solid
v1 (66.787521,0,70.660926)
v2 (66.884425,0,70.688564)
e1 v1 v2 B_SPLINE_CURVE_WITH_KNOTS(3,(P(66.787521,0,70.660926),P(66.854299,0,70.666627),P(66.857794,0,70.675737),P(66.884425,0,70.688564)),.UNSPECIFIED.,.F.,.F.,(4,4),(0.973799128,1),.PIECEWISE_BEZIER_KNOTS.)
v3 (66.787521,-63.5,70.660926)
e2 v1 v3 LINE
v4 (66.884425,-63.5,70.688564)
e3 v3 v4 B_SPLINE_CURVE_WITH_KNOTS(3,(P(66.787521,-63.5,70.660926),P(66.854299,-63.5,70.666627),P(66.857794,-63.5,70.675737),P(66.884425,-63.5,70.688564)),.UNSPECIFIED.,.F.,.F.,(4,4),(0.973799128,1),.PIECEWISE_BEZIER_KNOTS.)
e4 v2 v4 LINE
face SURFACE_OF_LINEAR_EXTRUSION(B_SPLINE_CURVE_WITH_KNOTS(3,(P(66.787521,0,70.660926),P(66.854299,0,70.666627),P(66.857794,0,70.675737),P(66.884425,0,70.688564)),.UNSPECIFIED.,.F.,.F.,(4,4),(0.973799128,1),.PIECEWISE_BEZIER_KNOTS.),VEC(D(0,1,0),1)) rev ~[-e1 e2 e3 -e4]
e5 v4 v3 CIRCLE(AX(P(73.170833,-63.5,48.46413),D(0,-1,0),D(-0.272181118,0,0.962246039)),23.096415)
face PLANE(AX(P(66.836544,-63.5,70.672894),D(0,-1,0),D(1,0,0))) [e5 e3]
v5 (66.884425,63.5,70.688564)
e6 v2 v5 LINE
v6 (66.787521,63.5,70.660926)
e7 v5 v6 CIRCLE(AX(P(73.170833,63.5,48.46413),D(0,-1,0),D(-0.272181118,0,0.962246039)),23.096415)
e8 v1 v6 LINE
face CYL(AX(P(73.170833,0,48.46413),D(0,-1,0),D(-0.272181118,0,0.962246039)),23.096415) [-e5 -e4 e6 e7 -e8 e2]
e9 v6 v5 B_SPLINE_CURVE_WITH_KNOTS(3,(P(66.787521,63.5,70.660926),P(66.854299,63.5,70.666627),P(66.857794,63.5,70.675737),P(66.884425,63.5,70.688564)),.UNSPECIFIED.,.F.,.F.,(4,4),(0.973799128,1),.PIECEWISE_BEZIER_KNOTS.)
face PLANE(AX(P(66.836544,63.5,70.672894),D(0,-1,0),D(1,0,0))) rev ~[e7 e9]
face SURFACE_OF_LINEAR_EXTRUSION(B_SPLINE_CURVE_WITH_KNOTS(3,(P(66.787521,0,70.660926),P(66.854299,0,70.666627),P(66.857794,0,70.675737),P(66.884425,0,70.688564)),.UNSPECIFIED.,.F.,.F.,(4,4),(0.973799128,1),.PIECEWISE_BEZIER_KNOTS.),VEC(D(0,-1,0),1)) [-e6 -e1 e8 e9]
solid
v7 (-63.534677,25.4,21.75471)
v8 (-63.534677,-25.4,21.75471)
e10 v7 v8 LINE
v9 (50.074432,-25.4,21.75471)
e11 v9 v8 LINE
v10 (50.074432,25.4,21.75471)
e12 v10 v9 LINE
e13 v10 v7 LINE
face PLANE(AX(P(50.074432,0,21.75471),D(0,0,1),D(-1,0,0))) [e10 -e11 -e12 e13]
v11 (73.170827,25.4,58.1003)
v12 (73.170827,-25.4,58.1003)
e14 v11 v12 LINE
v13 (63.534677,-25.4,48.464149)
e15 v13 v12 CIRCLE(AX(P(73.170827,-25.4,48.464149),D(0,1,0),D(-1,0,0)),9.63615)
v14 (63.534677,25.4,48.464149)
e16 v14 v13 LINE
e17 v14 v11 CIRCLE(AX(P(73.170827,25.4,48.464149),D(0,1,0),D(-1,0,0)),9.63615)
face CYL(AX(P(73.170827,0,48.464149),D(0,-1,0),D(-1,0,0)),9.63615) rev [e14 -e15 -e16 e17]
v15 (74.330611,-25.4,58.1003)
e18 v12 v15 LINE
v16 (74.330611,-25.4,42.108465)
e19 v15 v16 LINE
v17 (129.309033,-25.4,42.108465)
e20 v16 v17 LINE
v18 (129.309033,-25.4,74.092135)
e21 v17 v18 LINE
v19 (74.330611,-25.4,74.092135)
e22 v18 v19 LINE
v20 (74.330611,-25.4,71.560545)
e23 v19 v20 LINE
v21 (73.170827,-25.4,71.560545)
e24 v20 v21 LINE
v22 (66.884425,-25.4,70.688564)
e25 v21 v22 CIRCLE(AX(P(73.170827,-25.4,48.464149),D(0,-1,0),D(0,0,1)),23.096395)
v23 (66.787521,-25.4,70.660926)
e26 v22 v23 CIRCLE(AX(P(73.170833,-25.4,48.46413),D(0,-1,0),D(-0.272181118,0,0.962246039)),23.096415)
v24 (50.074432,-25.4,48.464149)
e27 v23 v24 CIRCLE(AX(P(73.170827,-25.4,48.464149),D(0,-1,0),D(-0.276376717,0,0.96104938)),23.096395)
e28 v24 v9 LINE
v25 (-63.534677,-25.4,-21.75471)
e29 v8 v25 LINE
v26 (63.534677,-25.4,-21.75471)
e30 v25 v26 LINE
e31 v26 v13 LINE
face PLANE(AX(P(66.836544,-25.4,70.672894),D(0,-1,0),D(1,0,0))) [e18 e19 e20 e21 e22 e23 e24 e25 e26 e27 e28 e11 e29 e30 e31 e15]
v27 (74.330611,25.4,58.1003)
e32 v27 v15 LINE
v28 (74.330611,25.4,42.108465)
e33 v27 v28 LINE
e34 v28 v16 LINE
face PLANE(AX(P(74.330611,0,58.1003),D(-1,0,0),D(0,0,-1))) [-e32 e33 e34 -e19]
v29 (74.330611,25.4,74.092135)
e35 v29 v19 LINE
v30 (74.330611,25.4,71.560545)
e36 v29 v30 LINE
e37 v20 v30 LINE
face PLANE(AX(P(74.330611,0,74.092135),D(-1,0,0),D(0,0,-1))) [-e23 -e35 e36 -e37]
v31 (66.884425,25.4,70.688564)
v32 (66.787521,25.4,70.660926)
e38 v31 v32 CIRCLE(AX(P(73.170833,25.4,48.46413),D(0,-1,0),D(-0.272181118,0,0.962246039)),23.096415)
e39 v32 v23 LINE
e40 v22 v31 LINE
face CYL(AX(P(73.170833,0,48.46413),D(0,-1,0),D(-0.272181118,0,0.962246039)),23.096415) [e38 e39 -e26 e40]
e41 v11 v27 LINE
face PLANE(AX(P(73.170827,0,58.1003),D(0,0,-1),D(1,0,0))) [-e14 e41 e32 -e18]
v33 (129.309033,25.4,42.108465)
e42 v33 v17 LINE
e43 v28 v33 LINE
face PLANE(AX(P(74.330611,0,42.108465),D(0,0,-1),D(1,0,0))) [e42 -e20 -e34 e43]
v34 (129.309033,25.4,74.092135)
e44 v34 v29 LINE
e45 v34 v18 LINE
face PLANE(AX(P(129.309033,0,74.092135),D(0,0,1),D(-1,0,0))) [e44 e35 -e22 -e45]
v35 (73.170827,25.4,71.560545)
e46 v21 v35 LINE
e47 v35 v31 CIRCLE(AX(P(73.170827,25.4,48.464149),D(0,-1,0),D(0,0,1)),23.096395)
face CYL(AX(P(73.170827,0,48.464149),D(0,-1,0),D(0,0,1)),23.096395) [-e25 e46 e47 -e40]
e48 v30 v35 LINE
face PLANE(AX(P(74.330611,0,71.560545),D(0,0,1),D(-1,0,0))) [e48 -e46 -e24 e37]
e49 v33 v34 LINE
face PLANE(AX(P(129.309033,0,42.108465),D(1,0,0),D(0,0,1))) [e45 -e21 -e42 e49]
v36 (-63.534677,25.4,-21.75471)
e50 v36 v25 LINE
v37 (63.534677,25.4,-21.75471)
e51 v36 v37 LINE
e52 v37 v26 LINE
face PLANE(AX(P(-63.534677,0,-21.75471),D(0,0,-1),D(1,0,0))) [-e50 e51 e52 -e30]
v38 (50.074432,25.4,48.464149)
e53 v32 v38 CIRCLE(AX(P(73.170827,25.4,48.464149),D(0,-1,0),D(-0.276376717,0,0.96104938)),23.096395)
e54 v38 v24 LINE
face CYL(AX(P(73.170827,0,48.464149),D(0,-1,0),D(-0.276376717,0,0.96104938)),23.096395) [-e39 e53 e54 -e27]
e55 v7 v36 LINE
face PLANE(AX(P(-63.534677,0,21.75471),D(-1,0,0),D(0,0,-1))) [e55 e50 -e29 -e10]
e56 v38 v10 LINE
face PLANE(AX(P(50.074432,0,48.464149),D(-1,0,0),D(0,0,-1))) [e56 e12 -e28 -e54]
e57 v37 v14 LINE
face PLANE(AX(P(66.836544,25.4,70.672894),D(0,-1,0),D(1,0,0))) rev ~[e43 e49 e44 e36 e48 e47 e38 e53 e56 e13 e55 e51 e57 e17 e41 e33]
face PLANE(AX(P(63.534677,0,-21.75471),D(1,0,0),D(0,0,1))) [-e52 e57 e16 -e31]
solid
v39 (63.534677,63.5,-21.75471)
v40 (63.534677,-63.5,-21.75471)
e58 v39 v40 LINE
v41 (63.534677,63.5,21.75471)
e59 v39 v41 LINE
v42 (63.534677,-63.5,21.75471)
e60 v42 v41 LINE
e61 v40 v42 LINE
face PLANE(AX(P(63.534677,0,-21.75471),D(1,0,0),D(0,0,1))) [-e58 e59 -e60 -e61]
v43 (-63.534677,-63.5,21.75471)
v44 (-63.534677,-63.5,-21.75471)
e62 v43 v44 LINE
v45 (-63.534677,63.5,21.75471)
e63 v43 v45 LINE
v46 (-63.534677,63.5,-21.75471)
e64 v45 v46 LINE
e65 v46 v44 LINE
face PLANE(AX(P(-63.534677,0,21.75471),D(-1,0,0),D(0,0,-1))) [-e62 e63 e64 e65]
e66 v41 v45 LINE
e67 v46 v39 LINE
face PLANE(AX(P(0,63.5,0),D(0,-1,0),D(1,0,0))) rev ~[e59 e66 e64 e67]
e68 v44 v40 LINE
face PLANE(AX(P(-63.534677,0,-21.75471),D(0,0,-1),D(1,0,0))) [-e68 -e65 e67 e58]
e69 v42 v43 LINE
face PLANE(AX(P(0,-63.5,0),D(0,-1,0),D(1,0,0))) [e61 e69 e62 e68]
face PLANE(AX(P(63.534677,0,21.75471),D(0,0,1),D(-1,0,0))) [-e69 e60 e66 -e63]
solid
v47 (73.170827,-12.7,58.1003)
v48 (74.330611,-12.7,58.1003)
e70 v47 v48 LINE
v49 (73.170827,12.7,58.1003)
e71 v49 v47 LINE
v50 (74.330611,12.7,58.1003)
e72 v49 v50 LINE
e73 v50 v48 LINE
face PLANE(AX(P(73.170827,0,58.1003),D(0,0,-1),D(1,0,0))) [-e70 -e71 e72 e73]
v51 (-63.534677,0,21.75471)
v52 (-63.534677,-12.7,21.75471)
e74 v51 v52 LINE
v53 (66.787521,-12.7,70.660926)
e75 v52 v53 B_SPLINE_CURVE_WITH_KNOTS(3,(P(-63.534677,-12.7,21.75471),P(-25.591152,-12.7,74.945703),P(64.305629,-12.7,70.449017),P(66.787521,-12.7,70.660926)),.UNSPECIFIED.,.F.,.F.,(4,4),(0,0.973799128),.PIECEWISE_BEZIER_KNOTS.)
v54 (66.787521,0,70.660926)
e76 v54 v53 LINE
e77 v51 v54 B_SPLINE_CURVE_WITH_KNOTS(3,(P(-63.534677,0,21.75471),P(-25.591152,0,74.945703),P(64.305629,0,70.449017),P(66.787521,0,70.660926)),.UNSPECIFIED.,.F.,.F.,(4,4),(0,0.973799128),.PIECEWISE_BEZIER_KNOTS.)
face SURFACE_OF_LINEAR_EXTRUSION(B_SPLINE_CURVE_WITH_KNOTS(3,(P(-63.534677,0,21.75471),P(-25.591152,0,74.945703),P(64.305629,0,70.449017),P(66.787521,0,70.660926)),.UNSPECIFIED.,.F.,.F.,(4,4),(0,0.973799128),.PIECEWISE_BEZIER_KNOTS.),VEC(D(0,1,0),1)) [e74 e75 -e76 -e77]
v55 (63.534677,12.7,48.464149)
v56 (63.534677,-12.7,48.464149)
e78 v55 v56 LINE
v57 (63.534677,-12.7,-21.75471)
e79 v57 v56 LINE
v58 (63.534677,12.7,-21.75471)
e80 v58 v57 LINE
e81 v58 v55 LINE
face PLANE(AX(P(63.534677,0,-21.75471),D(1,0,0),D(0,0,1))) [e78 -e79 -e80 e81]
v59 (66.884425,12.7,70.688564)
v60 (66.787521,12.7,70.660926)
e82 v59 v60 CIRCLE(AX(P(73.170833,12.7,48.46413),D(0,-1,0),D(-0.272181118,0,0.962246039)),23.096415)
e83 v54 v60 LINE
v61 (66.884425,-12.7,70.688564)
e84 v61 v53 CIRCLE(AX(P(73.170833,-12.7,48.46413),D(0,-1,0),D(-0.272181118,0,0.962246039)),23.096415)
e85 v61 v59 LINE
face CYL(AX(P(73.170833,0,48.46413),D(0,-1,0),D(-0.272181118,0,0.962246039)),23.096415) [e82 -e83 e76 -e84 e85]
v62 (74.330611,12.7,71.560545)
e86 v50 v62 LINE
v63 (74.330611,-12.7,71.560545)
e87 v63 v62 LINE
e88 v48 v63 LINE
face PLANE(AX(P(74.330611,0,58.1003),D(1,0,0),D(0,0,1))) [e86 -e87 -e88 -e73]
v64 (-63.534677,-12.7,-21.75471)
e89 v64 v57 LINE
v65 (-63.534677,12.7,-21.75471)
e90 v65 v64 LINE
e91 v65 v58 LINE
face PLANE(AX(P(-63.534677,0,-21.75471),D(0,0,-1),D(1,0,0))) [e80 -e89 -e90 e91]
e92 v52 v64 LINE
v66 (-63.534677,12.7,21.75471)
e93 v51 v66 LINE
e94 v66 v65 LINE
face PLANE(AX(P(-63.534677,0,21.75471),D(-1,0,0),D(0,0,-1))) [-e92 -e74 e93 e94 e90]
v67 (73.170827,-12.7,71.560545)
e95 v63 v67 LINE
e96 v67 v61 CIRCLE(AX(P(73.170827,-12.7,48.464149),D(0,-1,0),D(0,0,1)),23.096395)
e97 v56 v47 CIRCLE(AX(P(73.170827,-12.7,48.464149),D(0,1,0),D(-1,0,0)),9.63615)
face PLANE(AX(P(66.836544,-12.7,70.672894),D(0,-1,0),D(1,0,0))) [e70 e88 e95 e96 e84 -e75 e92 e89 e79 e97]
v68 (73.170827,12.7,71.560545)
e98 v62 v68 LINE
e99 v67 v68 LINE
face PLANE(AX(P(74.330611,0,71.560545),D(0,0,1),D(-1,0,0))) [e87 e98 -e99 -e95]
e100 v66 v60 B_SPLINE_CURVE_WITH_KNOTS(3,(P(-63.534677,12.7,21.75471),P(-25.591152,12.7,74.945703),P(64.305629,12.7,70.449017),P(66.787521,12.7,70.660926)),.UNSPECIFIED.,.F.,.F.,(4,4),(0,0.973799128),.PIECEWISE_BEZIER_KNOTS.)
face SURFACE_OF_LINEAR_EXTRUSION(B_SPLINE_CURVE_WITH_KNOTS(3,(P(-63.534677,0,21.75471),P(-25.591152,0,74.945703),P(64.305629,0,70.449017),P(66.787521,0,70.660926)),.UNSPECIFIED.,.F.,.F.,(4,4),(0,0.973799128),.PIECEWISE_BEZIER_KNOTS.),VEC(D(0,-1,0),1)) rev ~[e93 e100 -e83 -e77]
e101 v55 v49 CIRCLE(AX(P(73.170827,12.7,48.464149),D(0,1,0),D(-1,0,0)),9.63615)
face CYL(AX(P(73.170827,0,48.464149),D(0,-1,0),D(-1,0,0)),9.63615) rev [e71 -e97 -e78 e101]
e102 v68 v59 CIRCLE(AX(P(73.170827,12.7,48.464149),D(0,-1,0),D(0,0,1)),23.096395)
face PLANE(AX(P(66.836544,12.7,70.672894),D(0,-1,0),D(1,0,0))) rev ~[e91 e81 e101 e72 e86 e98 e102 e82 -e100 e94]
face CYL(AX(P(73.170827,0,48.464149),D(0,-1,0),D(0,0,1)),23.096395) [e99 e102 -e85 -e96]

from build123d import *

# Parameters (mm, degrees)
F1_DEPTH = 63.5
F2_DEPTH = 25.4
F3_DEPTH = 12.7


with BuildPart() as f1:
    # F0 (on Front) → F1 (new body, symmetric)
    with BuildSketch(Plane.XZ):
        Polygon((-63.5346770287, 21.7547100037), (-63.5346770287, -21.7547100037), (63.5346770287, -21.7547100037), (63.5346770287, 21.7547100037), (50.0744320452, 21.7547100037), align=None)
    extrude(amount=F1_DEPTH, both=True)


with BuildPart() as f1b:
    # F0 (on Front) → F1, piece 2 (new body, symmetric)
    with BuildSketch(Plane.XZ):
        with BuildLine():
            ThreePointArc((66.8844246133, 70.6885641711), (66.835957909, 70.6747977575), (66.7875213509, 70.6609256486))
            add(Edge.make_bspline(
                [(66.7875213509, 70.6609256486), (66.8542987198, 70.666627221), (66.8577943875, 70.675737456), (66.8844246133, 70.6885641711)],
                knots=[0.9737991277, 0.9737991277, 0.9737991277, 0.9737991277, 1, 1, 1, 1], degree=3))
        make_face()
    extrude(amount=F1_DEPTH, both=True)


with BuildPart() as f2:
    # F0 (on Front) → F2 (new body, symmetric)
    with BuildSketch(Plane.XZ):
        with BuildLine():
            ThreePointArc((66.8844246133, 70.6885641711), (66.835957909, 70.6747977575), (66.7875213509, 70.6609256486))
            add(Edge.make_bspline(
                [(66.7875213509, 70.6609256486), (66.8542987198, 70.666627221), (66.8577943875, 70.675737456), (66.8844246133, 70.6885641711)],
                knots=[0.9737991277, 0.9737991277, 0.9737991277, 0.9737991277, 1, 1, 1, 1], degree=3))
        make_face()
        Polygon((-63.5346770287, 21.7547100037), (-63.5346770287, -21.7547100037), (63.5346770287, -21.7547100037), (63.5346770287, 21.7547100037), (50.0744320452, 21.7547100037), align=None)
        with BuildLine():
            Line((50.0744320452, 21.7547100037), (63.5346770287, 21.7547100037))
            Line((63.5346770287, 21.7547100037), (63.5346770287, 48.4641493763))
            ThreePointArc((63.5346770287, 48.4641493763), (66.3570400807, 55.2779365345), (73.1708272389, 58.1002995865))
            Line((73.1708272389, 58.1002995865), (74.3306106452, 58.1002995865))
            Line((74.3306106452, 58.1002995865), (74.3306106452, 71.5605445699))
            Line((74.3306106452, 71.5605445699), (73.1708272389, 71.5605445699))
            ThreePointArc((73.1708272389, 71.5605445699), (69.9975321145, 71.3415108718), (66.8844246133, 70.6885641711))
            add(Edge.make_bspline(
                [(66.7875213509, 70.6609256486), (66.8542987198, 70.666627221), (66.8577943875, 70.675737456), (66.8844246133, 70.6885641711)],
                knots=[0.9737991277, 0.9737991277, 0.9737991277, 0.9737991277, 1, 1, 1, 1], degree=3))
            ThreePointArc((66.7875213509, 70.6609256486), (54.7198811063, 62.3568113874), (50.0744320452, 48.4641493763))
            Line((50.0744320452, 48.4641493763), (50.0744320452, 21.7547100037))
        make_face()
        Polygon((74.3306106452, 71.5605445699), (74.3306106452, 58.1002995865), (74.3306106452, 42.1084646629), (129.3090334657, 42.1084646629), (129.3090334657, 74.0921345101), (74.3306106452, 74.0921345101), align=None)
    extrude(amount=F2_DEPTH, both=True)


with BuildPart() as f3:
    # F0 (on Front) → F3 (new body, symmetric)
    with BuildSketch(Plane.XZ):
        with BuildLine():
            ThreePointArc((66.8844246133, 70.6885641711), (66.835957909, 70.6747977575), (66.7875213509, 70.6609256486))
            add(Edge.make_bspline(
                [(66.7875213509, 70.6609256486), (66.8542987198, 70.666627221), (66.8577943875, 70.675737456), (66.8844246133, 70.6885641711)],
                knots=[0.9737991277, 0.9737991277, 0.9737991277, 0.9737991277, 1, 1, 1, 1], degree=3))
        make_face()
        Polygon((-63.5346770287, 21.7547100037), (-63.5346770287, -21.7547100037), (63.5346770287, -21.7547100037), (63.5346770287, 21.7547100037), (50.0744320452, 21.7547100037), align=None)
        with BuildLine():
            Line((50.0744320452, 21.7547100037), (63.5346770287, 21.7547100037))
            Line((63.5346770287, 21.7547100037), (63.5346770287, 48.4641493763))
            ThreePointArc((63.5346770287, 48.4641493763), (66.3570400807, 55.2779365345), (73.1708272389, 58.1002995865))
            Line((73.1708272389, 58.1002995865), (74.3306106452, 58.1002995865))
            Line((74.3306106452, 58.1002995865), (74.3306106452, 71.5605445699))
            Line((74.3306106452, 71.5605445699), (73.1708272389, 71.5605445699))
            ThreePointArc((73.1708272389, 71.5605445699), (69.9975321145, 71.3415108718), (66.8844246133, 70.6885641711))
            add(Edge.make_bspline(
                [(66.7875213509, 70.6609256486), (66.8542987198, 70.666627221), (66.8577943875, 70.675737456), (66.8844246133, 70.6885641711)],
                knots=[0.9737991277, 0.9737991277, 0.9737991277, 0.9737991277, 1, 1, 1, 1], degree=3))
            ThreePointArc((66.7875213509, 70.6609256486), (54.7198811063, 62.3568113874), (50.0744320452, 48.4641493763))
            Line((50.0744320452, 48.4641493763), (50.0744320452, 21.7547100037))
        make_face()
        with BuildLine():
            add(Edge.make_bspline(
                [(-63.5346770287, 21.7547100037), (-25.5911517888, 74.9457031488), (64.3056290338, 70.4490171987), (66.7875213509, 70.6609256486)],
                knots=[0, 0, 0, 0, 0.9737991277, 0.9737991277, 0.9737991277, 0.9737991277], degree=3))
            Line((-63.5346770287, 21.7547100037), (50.0744320452, 21.7547100037))
            Line((50.0744320452, 21.7547100037), (50.0744320452, 48.4641493763))
            ThreePointArc((50.0744320452, 48.4641493763), (54.7198811063, 62.3568113874), (66.7875213509, 70.6609256486))
        make_face()
    extrude(amount=F3_DEPTH, both=True)


solid = Compound([f1.part, f1b.part, f2.part, f3.part])
